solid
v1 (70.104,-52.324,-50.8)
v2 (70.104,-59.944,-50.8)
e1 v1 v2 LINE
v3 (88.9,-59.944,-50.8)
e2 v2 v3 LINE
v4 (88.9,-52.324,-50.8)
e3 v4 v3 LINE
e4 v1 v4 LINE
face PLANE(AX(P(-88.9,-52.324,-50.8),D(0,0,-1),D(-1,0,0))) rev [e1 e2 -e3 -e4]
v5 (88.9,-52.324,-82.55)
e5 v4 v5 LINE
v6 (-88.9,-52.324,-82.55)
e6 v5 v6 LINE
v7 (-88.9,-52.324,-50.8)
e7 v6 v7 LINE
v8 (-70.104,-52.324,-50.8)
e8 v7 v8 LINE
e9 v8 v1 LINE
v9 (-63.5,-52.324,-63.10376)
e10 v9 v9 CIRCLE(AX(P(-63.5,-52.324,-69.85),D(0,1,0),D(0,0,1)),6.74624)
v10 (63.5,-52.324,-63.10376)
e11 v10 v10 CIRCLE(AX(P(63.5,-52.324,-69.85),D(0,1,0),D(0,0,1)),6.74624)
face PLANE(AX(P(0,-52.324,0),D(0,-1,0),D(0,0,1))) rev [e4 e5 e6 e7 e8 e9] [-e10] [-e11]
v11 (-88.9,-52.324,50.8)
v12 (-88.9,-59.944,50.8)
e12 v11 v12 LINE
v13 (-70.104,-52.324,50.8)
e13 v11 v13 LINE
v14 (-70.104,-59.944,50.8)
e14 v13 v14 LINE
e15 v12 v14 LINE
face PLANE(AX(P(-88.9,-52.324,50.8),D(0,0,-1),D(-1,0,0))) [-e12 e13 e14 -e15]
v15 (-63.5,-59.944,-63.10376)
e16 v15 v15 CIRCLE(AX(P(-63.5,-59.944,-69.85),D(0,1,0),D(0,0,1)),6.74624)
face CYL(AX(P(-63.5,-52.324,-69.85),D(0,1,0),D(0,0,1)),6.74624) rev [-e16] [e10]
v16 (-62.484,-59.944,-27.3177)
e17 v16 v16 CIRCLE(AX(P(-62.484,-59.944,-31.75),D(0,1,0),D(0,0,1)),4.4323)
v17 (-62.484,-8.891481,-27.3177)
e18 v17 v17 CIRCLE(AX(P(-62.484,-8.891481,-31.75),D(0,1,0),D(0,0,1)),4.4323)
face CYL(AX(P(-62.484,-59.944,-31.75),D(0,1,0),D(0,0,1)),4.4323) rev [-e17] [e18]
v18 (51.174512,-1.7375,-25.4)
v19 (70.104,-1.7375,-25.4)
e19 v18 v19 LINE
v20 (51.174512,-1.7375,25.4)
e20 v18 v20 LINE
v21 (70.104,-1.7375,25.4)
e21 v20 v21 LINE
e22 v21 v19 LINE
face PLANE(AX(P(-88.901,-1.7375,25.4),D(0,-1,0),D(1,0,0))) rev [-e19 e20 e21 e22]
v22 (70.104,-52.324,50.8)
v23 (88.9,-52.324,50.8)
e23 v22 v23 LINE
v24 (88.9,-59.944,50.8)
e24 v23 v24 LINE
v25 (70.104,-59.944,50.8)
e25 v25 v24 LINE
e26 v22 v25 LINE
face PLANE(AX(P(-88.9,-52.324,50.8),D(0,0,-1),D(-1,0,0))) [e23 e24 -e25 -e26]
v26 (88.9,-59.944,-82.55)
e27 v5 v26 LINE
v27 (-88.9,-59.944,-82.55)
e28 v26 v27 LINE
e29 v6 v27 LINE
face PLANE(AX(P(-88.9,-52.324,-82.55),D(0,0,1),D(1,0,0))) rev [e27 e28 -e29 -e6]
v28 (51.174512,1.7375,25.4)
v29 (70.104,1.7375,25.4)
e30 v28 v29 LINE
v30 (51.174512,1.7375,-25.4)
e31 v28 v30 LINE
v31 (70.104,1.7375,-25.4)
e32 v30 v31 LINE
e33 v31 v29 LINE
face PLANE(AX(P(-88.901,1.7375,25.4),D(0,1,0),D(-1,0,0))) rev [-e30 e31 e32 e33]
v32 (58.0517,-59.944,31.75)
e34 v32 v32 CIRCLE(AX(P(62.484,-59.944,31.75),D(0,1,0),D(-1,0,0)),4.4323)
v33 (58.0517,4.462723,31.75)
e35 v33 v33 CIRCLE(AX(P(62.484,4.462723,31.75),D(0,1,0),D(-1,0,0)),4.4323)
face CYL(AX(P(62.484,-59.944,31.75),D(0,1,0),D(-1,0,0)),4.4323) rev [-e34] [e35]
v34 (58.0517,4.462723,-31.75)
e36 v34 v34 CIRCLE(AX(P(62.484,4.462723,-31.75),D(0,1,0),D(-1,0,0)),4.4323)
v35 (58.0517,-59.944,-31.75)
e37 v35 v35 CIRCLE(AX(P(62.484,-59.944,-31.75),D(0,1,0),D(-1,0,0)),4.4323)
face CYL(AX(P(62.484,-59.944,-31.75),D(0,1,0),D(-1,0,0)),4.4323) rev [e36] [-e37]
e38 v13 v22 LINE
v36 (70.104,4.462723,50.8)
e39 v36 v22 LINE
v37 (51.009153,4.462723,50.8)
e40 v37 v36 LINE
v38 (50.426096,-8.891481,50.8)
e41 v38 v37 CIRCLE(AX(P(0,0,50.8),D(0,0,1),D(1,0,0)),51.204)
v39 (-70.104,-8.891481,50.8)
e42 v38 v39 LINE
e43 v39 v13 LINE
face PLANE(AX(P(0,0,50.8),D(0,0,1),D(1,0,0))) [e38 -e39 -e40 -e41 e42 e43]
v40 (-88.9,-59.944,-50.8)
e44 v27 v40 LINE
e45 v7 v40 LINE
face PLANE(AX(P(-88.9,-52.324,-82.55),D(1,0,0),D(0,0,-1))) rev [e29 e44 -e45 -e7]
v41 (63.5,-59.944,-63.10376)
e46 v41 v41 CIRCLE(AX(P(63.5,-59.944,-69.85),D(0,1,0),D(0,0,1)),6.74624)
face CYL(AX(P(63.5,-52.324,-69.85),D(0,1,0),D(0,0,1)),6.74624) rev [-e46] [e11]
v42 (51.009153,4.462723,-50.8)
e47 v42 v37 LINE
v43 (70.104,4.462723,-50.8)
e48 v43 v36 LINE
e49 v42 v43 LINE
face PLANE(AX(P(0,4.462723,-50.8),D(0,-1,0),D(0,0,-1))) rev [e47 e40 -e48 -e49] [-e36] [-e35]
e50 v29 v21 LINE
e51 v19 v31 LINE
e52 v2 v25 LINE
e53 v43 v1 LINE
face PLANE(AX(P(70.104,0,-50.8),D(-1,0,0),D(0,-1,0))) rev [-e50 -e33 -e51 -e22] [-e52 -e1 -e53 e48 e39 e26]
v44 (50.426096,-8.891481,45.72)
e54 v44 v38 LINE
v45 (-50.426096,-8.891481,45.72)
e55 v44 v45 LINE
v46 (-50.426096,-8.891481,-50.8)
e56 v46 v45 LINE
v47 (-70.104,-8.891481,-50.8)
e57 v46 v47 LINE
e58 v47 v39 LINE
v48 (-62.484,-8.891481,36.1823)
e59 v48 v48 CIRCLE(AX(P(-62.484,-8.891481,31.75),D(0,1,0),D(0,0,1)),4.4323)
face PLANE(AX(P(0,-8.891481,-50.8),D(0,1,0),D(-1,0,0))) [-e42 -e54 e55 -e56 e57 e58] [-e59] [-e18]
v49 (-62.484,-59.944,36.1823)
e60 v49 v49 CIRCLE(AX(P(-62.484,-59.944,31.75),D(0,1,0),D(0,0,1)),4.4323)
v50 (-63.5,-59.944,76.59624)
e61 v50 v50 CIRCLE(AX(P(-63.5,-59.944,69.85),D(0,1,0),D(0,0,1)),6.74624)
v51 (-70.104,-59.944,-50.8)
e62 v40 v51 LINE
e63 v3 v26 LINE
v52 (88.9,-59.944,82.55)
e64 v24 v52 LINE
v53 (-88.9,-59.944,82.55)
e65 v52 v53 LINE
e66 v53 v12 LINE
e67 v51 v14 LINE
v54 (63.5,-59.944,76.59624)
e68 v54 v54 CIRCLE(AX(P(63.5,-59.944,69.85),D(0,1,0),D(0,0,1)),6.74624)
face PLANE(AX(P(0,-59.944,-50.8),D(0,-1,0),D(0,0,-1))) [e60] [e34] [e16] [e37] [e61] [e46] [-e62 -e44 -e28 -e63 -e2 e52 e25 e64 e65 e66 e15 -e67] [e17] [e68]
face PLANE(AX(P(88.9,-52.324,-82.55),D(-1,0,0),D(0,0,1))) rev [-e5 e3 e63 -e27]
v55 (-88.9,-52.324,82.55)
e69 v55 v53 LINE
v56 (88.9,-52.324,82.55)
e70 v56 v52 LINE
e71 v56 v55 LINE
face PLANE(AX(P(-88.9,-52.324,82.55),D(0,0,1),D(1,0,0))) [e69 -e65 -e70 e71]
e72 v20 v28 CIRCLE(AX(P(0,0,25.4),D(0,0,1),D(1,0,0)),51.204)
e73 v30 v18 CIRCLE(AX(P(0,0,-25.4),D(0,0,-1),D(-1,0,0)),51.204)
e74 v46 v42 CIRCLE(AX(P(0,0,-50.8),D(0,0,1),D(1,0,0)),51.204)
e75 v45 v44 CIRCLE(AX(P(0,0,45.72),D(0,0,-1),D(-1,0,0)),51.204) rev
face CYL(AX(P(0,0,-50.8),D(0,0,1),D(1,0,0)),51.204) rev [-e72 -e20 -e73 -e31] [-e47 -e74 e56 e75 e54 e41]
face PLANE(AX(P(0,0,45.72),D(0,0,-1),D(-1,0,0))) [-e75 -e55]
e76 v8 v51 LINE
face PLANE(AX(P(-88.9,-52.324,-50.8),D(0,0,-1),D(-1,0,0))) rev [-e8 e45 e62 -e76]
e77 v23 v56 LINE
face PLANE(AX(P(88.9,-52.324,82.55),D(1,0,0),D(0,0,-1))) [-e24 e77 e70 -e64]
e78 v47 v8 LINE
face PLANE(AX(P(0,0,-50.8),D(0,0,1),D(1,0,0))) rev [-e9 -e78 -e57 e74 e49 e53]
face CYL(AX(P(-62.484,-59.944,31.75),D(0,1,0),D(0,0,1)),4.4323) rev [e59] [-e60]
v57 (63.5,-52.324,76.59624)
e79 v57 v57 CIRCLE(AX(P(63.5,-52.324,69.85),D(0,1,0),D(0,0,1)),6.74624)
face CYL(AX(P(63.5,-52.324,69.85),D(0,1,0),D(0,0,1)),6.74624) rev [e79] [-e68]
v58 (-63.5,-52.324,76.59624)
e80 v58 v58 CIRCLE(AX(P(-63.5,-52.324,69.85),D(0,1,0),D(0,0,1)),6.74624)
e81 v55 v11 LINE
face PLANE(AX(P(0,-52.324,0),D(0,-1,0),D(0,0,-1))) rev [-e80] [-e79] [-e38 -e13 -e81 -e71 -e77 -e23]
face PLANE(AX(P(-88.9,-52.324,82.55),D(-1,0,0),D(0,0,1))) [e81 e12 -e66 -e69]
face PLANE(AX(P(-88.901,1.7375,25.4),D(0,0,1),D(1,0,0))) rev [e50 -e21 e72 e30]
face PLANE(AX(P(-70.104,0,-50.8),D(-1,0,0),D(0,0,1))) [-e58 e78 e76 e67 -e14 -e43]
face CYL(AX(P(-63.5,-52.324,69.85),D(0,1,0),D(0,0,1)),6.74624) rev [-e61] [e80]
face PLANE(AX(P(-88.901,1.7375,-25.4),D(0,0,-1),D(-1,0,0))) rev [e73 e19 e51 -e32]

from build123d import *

# Parameters (mm, degrees)
SKETCH1_W                       = 10.823103443
SKETCH1_H                       = 51.052518719
BOSS_EXTRUDE1_DEPTH             = 50.8
SKETCH2_W                       = 177.8
SKETCH2_H                       = 31.75
BOSS_EXTRUDE2_DEPTH             = 7.62
F_1_2_START                     = -59.944
F_1_2_CLEARANCE_HOLE1_OUTLINE_R = 6.74624
F_1_2_CLEARANCE_HOLE1_DEPTH     = 7.62
SKETCH7_W                       = 140.208
SKETCH7_H                       = 43.432518719
BOSS_EXTRUDE3_DEPTH             = 5.08
CUT_EXTRUDE1_REACH              = 190.918
CUT_EXTRUDE1_END_RADIUS         = 51.203999954
SKETCH6_W                       = 50.8
SKETCH6_H                       = 3.474999908
SKETCH8_R                       = 4.4323
CUT_EXTRUDE2_DEPTH              = 138.353334223
SKETCH9_R                       = 4.4323
CUT_EXTRUDE3_DEPTH              = 132.62094122


# Read off the part's stored shape, not the designer's step: 1/2 Clearance Hole1
with BuildPart() as part:
    # Sketch1 → Boss-Extrude1 (new, symmetric)
    with BuildSketch(Plane.XY):
        with Locations((-64.692448278, -34.41774064)):
            Rectangle(SKETCH1_W, SKETCH1_H)
        with BuildLine():
            ThreePointArc((-2e-09, -59.944), (-39.117081832, -45.421768404), (-59.280896557, -8.891481281))
            Line((-59.280896557, -8.891481281), (-59.280896557, -59.944))
            Line((-59.280896557, -59.944), (-2e-09, -59.944))
        make_face()
        with BuildLine():
            Line((-50.42609614, -8.891481281), (-59.280896557, -8.891481281))
            ThreePointArc((-59.280896557, -8.891481281), (-39.117081832, -45.421768404), (-2e-09, -59.944))
            ThreePointArc((-2e-09, -59.944), (42.386808891, -42.386808892), (59.944, 0))
            ThreePointArc((59.944, 0), (59.902397652, 2.232911009), (59.777648353, 4.462722648))
            Line((59.777648353, 4.462722648), (51.009153275, 4.462722648))
            ThreePointArc((51.009153275, 4.462722648), (51.155265092, 2.233487109), (51.203999954, 0))
            ThreePointArc((51.203999954, 0), (4.462722648, -51.009153275), (-50.42609614, -8.891481281))
        make_face()
        with BuildLine():
            ThreePointArc((59.944, 0), (42.386808891, -42.386808892), (-2e-09, -59.944))
            Line((-2e-09, -59.944), (59.944, -59.944))
            Line((59.944, -59.944), (59.944, 0))
        make_face()
        with BuildLine():
            Line((70.104, 4.462722648), (59.777648353, 4.462722648))
            ThreePointArc((59.777648353, 4.462722648), (59.902397652, 2.232911009), (59.944, 0))
            Line((59.944, 0), (59.944, -59.944))
            Line((59.944, -59.944), (70.104, -59.944))
            Line((70.104, -59.944), (70.104, 4.462722648))
        make_face()
    extrude(amount=BOSS_EXTRUDE1_DEPTH, both=True)

    # Sketch2 → Boss-Extrude2 (add)
    with BuildSketch(Plane.XZ.offset(59.944)):
        with Locations((0, 66.675)):
            Rectangle(SKETCH2_W, SKETCH2_H)
    boss_extrude2 = extrude(amount=-BOSS_EXTRUDE2_DEPTH)

    # 1/2 Clearance Hole1 outline → 1/2 Clearance Hole1 (cut)
    with BuildSketch(Plane(origin=(0, 0, 0), x_dir=(1, 0, 0), z_dir=(0, 1, 0)).offset(F_1_2_START)):
        with Locations((63.5, -69.85)):
            Circle(F_1_2_CLEARANCE_HOLE1_OUTLINE_R)
        with Locations((-63.5, -69.85)):
            Circle(F_1_2_CLEARANCE_HOLE1_OUTLINE_R)
    f_1_2_clearance_hole1 = extrude(amount=F_1_2_CLEARANCE_HOLE1_DEPTH, mode=Mode.SUBTRACT)

    # Mirror1: Boss-Extrude2, 1/2 Clearance Hole1 across plane
    add(boss_extrude2.mirror(Plane.XY))
    add(f_1_2_clearance_hole1.mirror(Plane.XY), mode=Mode.SUBTRACT)

    # Sketch7 → Boss-Extrude3 (add)
    with BuildSketch(Plane.XY.offset(50.8)):
        with Locations((0, -30.607740641)):
            Rectangle(SKETCH7_W, SKETCH7_H)
    extrude(amount=-BOSS_EXTRUDE3_DEPTH)

    # Cut-Extrude1: up to this cylinder (the profile starts outside it)
    cut_extrude1_end = Plane(origin=(0, 0, 0), z_dir=(0, 0, 1)) * Cylinder(CUT_EXTRUDE1_END_RADIUS, 485.243999908, mode=Mode.PRIVATE)
    # Sketch6 → Cut-Extrude1 (cut, up to the surface)
    with BuildSketch(Plane(origin=(70.104, 0, 0), x_dir=(0, 0, -1), z_dir=(1, 0, 0)), mode=Mode.PRIVATE) as cut_extrude1_sk1:
        Rectangle(SKETCH6_W, SKETCH6_H)
    cut_extrude1_tool1 = extrude(cut_extrude1_sk1.sketch, amount=-CUT_EXTRUDE1_REACH, mode=Mode.PRIVATE) - cut_extrude1_end
    add(cut_extrude1_tool1.solids().sort_by_distance((70.104, 0, 0))[0], mode=Mode.SUBTRACT)

    # Sketch8 → Cut-Extrude2 (cut, through all)
    with BuildSketch(Plane(origin=(0, 4.462722648, 0), x_dir=(1, 0, 0), z_dir=(0, 1, 0))):
        with Locations(Location((62.484, 31.75, 0), (0, 0, 180))):
            Circle(SKETCH8_R)
        with Locations(Location((62.484, -31.75, 0), (0, 0, 180))):
            Circle(SKETCH8_R)
    extrude(amount=-CUT_EXTRUDE2_DEPTH, mode=Mode.SUBTRACT)

    # Sketch9 → Cut-Extrude3 (cut, through all)
    with BuildSketch(Plane(origin=(0, -8.891481281, 0), x_dir=(1, 0, 0), z_dir=(0, 1, 0))):
        with Locations(Location((-62.484, 31.75, 0), (0, 0, 270))):
            Circle(SKETCH9_R)
        with Locations(Location((-62.484, -31.75, 0), (0, 0, 270))):
            Circle(SKETCH9_R)
    extrude(amount=-CUT_EXTRUDE3_DEPTH, mode=Mode.SUBTRACT)


solid = part.part
